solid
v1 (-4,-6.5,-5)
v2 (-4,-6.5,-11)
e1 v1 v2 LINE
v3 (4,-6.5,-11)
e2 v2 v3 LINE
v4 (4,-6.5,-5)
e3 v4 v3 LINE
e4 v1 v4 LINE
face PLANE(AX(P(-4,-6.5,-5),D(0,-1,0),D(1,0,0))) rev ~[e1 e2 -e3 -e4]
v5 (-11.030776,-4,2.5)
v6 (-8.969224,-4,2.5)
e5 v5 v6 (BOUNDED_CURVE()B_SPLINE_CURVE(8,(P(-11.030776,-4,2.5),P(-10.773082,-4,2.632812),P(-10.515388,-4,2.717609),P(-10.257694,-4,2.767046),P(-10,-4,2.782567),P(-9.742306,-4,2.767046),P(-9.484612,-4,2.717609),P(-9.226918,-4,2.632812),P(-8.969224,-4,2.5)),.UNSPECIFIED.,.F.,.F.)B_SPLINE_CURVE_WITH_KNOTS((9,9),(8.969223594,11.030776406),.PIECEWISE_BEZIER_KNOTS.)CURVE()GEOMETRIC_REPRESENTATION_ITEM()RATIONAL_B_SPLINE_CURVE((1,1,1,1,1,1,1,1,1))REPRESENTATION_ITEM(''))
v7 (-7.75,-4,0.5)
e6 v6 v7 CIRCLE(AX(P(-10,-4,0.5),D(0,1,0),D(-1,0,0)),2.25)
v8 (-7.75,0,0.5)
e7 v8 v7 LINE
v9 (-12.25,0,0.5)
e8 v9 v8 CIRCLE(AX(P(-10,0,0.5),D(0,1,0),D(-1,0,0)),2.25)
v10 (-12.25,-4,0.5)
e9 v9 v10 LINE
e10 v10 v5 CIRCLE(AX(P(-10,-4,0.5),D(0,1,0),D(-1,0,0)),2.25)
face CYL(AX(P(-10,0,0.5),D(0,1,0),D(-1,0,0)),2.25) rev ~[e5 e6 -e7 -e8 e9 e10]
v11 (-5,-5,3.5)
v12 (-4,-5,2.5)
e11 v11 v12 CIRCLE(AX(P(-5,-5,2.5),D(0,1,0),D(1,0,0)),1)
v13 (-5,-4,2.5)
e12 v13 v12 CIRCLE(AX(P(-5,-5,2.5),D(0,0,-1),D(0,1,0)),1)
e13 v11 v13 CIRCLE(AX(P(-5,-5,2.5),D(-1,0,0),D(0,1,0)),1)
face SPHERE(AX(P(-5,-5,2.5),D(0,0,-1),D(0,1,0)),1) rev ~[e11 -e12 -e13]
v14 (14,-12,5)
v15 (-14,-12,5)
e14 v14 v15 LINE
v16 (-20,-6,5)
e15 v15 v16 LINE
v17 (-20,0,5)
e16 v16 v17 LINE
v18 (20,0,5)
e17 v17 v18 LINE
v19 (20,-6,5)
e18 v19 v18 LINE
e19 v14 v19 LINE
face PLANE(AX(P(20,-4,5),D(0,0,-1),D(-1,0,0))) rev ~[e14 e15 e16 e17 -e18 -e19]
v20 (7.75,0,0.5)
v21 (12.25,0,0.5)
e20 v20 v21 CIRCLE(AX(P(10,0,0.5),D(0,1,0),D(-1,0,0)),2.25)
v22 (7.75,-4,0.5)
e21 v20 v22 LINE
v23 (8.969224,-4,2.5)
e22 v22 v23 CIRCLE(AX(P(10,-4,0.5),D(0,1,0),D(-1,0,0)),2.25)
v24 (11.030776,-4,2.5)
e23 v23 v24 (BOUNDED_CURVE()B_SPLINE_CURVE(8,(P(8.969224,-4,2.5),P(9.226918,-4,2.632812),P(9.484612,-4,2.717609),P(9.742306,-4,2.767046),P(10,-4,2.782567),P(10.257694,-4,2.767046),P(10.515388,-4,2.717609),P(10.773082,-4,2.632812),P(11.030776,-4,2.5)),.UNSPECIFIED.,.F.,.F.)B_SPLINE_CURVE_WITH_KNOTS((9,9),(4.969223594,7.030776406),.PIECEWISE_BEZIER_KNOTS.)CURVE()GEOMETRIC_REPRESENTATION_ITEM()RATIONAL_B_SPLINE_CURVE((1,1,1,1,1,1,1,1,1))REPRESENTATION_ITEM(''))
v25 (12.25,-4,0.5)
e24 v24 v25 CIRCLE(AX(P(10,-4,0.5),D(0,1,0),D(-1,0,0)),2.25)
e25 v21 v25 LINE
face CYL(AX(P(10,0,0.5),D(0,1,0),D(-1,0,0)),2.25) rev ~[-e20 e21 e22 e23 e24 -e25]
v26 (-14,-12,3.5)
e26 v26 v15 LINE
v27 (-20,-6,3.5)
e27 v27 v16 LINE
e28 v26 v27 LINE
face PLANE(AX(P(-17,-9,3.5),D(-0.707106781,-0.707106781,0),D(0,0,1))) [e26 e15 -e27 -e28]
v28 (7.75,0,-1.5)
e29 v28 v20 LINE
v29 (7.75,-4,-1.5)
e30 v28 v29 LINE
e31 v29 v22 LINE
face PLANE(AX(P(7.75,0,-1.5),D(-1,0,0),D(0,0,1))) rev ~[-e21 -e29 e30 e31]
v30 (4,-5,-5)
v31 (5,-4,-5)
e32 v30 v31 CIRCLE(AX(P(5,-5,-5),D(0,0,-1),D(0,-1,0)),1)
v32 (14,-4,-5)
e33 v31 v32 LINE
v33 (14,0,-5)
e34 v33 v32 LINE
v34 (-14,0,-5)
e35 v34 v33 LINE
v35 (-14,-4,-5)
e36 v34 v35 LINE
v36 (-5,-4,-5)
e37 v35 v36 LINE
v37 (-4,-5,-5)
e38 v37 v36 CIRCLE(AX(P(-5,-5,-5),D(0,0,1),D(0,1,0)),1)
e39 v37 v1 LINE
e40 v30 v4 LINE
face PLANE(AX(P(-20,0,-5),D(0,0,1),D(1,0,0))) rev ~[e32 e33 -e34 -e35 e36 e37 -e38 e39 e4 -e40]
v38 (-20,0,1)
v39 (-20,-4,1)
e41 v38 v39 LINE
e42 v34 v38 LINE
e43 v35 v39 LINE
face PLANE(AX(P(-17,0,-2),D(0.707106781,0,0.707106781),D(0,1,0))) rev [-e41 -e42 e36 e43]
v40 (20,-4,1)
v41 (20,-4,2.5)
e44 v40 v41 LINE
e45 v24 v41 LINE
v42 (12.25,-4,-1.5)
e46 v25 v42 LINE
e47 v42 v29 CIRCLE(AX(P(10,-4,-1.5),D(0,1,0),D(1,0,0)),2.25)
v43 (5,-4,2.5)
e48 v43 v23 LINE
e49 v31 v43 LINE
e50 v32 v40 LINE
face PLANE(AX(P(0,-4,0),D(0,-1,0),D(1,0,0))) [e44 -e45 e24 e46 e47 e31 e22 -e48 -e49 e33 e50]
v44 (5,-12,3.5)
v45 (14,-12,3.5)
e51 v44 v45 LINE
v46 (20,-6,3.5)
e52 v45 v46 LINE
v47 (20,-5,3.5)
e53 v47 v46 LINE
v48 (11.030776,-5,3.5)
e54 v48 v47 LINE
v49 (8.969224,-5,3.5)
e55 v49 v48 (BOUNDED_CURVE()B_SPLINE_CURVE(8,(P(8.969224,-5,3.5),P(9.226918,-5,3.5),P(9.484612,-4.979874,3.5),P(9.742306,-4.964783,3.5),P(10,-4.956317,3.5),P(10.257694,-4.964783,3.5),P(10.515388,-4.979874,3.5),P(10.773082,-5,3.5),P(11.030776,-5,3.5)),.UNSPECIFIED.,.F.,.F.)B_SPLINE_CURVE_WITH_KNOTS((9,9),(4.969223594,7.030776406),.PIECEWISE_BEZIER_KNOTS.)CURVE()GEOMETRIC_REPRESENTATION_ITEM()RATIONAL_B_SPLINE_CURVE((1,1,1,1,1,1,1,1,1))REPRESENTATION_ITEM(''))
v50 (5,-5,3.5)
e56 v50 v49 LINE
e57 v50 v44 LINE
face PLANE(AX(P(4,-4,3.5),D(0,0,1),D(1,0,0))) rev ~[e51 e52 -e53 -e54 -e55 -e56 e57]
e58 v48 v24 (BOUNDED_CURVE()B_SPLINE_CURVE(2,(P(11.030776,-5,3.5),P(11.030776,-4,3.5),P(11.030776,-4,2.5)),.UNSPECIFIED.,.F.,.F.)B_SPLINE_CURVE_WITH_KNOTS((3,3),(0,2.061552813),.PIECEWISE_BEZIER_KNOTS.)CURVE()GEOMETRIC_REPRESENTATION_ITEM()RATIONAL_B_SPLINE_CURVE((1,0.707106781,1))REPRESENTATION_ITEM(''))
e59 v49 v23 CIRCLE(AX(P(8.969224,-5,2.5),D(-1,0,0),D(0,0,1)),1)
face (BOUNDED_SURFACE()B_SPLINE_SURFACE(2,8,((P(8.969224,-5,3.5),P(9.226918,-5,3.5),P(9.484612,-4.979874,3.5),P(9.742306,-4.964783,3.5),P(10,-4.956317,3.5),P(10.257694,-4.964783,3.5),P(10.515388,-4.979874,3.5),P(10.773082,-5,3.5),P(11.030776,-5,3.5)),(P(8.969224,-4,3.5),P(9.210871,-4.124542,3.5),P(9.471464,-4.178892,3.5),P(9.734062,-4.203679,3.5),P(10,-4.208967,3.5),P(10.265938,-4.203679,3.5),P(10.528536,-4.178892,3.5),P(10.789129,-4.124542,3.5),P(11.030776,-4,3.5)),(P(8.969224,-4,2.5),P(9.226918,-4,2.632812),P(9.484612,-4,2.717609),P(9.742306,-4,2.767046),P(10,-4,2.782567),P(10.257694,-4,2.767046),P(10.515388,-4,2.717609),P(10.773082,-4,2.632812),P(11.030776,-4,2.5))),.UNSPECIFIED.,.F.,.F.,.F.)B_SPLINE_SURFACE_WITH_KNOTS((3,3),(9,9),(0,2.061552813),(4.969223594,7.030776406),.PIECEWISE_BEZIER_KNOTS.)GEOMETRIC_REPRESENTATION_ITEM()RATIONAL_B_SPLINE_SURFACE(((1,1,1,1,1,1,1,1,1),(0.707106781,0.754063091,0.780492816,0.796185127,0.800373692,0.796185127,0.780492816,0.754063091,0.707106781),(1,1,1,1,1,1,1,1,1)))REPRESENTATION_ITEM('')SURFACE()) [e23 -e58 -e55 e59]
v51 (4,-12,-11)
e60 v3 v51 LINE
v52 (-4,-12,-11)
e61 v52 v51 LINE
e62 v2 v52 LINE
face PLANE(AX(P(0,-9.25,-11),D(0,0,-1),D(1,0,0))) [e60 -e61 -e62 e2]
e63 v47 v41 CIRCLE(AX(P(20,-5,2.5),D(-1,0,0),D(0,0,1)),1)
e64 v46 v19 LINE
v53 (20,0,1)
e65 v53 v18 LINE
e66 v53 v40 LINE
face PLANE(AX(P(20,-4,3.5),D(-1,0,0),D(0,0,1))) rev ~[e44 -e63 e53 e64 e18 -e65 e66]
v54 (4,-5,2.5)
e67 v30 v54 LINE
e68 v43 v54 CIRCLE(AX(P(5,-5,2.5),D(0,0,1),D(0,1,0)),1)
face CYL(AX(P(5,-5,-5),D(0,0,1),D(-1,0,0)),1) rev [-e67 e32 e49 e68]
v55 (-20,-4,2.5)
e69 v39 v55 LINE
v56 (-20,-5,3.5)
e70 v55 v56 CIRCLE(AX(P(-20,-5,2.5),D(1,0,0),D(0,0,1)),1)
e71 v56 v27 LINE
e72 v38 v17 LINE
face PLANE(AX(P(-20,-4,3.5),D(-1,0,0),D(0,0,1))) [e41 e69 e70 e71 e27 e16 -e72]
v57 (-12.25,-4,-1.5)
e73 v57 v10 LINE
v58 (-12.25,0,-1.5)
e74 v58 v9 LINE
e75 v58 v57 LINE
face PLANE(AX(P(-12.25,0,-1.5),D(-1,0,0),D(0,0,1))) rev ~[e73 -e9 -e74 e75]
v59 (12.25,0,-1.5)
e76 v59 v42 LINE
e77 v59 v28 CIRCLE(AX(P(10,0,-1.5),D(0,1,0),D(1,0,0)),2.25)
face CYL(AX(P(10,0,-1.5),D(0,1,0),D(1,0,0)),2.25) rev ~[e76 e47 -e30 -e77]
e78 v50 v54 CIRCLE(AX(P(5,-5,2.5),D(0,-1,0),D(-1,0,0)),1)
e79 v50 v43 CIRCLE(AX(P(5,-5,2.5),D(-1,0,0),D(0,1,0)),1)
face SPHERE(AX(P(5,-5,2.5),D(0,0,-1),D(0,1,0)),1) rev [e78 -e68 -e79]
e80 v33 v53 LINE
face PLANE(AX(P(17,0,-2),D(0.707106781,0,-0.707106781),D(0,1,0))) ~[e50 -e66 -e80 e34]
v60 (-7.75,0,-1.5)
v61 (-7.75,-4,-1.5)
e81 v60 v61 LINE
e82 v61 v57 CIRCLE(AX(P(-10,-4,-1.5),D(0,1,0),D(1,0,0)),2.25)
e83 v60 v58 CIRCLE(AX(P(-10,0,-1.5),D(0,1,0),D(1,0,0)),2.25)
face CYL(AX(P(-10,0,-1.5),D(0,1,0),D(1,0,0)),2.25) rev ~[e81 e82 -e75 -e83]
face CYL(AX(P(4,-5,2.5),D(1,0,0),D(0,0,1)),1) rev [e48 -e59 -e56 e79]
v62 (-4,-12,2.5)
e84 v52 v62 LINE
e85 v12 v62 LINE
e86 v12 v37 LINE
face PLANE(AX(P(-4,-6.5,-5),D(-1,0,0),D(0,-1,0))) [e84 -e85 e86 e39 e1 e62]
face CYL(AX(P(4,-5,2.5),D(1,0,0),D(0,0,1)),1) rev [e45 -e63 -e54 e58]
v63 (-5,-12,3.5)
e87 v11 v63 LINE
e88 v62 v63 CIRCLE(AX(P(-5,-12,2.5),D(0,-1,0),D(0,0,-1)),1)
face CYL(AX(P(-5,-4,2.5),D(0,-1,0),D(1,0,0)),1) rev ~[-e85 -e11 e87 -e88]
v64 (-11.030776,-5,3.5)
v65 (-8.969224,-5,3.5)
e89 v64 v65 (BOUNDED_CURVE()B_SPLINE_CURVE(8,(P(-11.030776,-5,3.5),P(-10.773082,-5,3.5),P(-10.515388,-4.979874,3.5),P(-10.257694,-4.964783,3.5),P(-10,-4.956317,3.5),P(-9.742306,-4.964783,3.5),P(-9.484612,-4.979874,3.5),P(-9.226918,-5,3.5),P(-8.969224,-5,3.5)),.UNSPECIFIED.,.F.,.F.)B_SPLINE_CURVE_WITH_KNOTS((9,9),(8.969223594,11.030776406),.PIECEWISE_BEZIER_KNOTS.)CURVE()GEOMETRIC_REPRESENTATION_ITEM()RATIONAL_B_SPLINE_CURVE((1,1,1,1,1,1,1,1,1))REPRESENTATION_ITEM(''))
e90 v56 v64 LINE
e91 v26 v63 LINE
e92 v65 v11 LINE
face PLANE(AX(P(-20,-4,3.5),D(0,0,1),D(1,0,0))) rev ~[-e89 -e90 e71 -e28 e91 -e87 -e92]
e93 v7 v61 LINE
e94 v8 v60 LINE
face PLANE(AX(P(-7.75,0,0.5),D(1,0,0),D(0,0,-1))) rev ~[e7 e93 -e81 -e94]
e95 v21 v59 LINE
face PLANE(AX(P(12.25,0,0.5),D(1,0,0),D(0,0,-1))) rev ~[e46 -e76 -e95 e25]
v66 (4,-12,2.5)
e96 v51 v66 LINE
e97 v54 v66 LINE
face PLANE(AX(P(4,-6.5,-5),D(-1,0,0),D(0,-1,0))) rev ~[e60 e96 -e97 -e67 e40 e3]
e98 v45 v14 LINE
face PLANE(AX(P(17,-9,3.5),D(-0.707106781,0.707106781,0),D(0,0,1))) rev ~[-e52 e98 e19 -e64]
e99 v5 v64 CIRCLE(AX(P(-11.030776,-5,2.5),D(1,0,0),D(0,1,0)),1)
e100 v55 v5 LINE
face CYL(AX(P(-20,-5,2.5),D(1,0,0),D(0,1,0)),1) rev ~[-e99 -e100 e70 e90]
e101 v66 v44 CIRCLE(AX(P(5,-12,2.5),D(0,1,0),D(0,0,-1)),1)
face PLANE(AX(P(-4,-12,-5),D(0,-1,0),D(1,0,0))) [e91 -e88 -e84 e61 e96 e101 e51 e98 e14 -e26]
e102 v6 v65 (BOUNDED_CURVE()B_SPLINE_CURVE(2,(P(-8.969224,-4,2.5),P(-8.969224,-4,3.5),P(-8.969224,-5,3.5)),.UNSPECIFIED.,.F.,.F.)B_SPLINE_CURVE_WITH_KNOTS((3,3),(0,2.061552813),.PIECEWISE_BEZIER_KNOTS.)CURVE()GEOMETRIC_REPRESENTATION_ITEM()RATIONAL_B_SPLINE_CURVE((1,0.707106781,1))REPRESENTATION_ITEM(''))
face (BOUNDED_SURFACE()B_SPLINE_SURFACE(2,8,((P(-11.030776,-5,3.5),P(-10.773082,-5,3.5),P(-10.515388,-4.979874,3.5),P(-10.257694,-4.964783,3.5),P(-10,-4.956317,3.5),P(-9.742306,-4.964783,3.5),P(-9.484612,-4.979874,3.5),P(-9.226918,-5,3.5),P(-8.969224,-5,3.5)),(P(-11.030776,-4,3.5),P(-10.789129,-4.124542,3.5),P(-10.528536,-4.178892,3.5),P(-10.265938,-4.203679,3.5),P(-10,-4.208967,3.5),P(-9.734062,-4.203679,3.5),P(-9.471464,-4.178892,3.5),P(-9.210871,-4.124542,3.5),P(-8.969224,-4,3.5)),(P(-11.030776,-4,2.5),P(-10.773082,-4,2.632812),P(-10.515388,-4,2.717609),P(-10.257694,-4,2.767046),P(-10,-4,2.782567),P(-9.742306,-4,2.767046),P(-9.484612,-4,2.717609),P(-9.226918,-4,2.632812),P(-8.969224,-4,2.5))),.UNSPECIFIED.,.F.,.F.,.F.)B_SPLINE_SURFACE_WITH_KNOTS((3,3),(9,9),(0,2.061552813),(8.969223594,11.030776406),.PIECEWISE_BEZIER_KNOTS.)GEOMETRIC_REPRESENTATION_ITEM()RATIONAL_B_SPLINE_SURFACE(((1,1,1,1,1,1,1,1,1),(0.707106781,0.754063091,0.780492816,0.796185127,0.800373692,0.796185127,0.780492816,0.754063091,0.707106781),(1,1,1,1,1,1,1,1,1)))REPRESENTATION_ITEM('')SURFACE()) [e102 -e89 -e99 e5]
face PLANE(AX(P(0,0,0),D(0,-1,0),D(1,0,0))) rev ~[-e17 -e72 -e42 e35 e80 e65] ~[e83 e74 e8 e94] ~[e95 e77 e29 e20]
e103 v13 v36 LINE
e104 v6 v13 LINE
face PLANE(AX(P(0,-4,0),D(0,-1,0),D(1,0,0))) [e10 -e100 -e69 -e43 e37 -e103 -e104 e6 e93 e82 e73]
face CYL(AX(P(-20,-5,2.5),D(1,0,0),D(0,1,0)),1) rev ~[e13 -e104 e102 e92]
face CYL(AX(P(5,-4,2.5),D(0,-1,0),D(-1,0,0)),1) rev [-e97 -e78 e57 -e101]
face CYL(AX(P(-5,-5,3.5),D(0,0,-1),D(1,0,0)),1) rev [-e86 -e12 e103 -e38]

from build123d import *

# Parameters (mm, degrees)
F0_W     = 40
F0_H     = 10
F1_DEPTH = 4
F2_W     = 16
F2_H     = 1.5
F3_DEPTH = 8
F4_W     = 8
F4_H     = 5.5
F5_DEPTH = 6
F6_R     = 1
F7_SIZE  = 6


# Not quite as in the source:
# - a feature names something its author has since deleted; it is built from what else it names


with BuildPart() as f1:
    # F0 (on Front) → F1 (new body)
    with BuildSketch(Plane.XZ):
        Rectangle(F0_W, F0_H)
        with BuildLine():
            Line((-12.25, -1.5), (-12.25, 0.5))
            ThreePointArc((-12.25, 0.5), (-10, 2.75), (-7.75, 0.5))
            Line((-7.75, 0.5), (-7.75, -1.5))
            ThreePointArc((-7.75, -1.5), (-10, -3.75), (-12.25, -1.5))
        make_face(mode=Mode.SUBTRACT)
        with BuildLine():
            ThreePointArc((7.75, 0.5), (10, 2.75), (12.25, 0.5))
            Line((12.25, 0.5), (12.25, -1.5))
            ThreePointArc((12.25, -1.5), (10, -3.75), (7.75, -1.5))
            Line((7.75, -1.5), (7.75, 0.5))
        make_face(mode=Mode.SUBTRACT)
    extrude(amount=F1_DEPTH)

    # F2 (on face) → F3 (join)
    with BuildSketch(Plane.XZ.offset(4)):
        Polygon((4, 5), (-4, 5), (-4, 3.5), (-4, -5), (4, -5), (4, 3.5), align=None)
        with Locations((-12, 4.25)):
            Rectangle(F2_W, F2_H)
        with Locations((12, 4.25)):
            Rectangle(F2_W, F2_H)
    extrude(amount=F3_DEPTH)

    # F4 (on face) → F5 (join)
    with BuildSketch(Plane(origin=(0, 0, -5), x_dir=(1, 0, 0), z_dir=(0, 0, -1))):
        with Locations((0, 9.25)):
            Rectangle(F4_W, F4_H)
    extrude(amount=F5_DEPTH)

    # F6
    f6_edges = [f1.edges().sort_by_distance(p)[0] for p in [
        (4, -4, -0.75),
        (-4, -4, -0.75),
        (-12, -4, 3.5),
        (12, -4, 3.5),
        (4, -8, 3.5),
        (-4, -8, 3.5),
    ]]
    fillet(f6_edges, radius=F6_R)

    # F7
    f7_edges = [f1.edges().sort_by_distance(p)[0] for p in [
        (-20, -12, 4.25),
        (20, -12, 4.25),
        (20, -2, -5),
        (-20, -2, -5),
    ]]
    chamfer(f7_edges, length=F7_SIZE)


solid = f1.part
